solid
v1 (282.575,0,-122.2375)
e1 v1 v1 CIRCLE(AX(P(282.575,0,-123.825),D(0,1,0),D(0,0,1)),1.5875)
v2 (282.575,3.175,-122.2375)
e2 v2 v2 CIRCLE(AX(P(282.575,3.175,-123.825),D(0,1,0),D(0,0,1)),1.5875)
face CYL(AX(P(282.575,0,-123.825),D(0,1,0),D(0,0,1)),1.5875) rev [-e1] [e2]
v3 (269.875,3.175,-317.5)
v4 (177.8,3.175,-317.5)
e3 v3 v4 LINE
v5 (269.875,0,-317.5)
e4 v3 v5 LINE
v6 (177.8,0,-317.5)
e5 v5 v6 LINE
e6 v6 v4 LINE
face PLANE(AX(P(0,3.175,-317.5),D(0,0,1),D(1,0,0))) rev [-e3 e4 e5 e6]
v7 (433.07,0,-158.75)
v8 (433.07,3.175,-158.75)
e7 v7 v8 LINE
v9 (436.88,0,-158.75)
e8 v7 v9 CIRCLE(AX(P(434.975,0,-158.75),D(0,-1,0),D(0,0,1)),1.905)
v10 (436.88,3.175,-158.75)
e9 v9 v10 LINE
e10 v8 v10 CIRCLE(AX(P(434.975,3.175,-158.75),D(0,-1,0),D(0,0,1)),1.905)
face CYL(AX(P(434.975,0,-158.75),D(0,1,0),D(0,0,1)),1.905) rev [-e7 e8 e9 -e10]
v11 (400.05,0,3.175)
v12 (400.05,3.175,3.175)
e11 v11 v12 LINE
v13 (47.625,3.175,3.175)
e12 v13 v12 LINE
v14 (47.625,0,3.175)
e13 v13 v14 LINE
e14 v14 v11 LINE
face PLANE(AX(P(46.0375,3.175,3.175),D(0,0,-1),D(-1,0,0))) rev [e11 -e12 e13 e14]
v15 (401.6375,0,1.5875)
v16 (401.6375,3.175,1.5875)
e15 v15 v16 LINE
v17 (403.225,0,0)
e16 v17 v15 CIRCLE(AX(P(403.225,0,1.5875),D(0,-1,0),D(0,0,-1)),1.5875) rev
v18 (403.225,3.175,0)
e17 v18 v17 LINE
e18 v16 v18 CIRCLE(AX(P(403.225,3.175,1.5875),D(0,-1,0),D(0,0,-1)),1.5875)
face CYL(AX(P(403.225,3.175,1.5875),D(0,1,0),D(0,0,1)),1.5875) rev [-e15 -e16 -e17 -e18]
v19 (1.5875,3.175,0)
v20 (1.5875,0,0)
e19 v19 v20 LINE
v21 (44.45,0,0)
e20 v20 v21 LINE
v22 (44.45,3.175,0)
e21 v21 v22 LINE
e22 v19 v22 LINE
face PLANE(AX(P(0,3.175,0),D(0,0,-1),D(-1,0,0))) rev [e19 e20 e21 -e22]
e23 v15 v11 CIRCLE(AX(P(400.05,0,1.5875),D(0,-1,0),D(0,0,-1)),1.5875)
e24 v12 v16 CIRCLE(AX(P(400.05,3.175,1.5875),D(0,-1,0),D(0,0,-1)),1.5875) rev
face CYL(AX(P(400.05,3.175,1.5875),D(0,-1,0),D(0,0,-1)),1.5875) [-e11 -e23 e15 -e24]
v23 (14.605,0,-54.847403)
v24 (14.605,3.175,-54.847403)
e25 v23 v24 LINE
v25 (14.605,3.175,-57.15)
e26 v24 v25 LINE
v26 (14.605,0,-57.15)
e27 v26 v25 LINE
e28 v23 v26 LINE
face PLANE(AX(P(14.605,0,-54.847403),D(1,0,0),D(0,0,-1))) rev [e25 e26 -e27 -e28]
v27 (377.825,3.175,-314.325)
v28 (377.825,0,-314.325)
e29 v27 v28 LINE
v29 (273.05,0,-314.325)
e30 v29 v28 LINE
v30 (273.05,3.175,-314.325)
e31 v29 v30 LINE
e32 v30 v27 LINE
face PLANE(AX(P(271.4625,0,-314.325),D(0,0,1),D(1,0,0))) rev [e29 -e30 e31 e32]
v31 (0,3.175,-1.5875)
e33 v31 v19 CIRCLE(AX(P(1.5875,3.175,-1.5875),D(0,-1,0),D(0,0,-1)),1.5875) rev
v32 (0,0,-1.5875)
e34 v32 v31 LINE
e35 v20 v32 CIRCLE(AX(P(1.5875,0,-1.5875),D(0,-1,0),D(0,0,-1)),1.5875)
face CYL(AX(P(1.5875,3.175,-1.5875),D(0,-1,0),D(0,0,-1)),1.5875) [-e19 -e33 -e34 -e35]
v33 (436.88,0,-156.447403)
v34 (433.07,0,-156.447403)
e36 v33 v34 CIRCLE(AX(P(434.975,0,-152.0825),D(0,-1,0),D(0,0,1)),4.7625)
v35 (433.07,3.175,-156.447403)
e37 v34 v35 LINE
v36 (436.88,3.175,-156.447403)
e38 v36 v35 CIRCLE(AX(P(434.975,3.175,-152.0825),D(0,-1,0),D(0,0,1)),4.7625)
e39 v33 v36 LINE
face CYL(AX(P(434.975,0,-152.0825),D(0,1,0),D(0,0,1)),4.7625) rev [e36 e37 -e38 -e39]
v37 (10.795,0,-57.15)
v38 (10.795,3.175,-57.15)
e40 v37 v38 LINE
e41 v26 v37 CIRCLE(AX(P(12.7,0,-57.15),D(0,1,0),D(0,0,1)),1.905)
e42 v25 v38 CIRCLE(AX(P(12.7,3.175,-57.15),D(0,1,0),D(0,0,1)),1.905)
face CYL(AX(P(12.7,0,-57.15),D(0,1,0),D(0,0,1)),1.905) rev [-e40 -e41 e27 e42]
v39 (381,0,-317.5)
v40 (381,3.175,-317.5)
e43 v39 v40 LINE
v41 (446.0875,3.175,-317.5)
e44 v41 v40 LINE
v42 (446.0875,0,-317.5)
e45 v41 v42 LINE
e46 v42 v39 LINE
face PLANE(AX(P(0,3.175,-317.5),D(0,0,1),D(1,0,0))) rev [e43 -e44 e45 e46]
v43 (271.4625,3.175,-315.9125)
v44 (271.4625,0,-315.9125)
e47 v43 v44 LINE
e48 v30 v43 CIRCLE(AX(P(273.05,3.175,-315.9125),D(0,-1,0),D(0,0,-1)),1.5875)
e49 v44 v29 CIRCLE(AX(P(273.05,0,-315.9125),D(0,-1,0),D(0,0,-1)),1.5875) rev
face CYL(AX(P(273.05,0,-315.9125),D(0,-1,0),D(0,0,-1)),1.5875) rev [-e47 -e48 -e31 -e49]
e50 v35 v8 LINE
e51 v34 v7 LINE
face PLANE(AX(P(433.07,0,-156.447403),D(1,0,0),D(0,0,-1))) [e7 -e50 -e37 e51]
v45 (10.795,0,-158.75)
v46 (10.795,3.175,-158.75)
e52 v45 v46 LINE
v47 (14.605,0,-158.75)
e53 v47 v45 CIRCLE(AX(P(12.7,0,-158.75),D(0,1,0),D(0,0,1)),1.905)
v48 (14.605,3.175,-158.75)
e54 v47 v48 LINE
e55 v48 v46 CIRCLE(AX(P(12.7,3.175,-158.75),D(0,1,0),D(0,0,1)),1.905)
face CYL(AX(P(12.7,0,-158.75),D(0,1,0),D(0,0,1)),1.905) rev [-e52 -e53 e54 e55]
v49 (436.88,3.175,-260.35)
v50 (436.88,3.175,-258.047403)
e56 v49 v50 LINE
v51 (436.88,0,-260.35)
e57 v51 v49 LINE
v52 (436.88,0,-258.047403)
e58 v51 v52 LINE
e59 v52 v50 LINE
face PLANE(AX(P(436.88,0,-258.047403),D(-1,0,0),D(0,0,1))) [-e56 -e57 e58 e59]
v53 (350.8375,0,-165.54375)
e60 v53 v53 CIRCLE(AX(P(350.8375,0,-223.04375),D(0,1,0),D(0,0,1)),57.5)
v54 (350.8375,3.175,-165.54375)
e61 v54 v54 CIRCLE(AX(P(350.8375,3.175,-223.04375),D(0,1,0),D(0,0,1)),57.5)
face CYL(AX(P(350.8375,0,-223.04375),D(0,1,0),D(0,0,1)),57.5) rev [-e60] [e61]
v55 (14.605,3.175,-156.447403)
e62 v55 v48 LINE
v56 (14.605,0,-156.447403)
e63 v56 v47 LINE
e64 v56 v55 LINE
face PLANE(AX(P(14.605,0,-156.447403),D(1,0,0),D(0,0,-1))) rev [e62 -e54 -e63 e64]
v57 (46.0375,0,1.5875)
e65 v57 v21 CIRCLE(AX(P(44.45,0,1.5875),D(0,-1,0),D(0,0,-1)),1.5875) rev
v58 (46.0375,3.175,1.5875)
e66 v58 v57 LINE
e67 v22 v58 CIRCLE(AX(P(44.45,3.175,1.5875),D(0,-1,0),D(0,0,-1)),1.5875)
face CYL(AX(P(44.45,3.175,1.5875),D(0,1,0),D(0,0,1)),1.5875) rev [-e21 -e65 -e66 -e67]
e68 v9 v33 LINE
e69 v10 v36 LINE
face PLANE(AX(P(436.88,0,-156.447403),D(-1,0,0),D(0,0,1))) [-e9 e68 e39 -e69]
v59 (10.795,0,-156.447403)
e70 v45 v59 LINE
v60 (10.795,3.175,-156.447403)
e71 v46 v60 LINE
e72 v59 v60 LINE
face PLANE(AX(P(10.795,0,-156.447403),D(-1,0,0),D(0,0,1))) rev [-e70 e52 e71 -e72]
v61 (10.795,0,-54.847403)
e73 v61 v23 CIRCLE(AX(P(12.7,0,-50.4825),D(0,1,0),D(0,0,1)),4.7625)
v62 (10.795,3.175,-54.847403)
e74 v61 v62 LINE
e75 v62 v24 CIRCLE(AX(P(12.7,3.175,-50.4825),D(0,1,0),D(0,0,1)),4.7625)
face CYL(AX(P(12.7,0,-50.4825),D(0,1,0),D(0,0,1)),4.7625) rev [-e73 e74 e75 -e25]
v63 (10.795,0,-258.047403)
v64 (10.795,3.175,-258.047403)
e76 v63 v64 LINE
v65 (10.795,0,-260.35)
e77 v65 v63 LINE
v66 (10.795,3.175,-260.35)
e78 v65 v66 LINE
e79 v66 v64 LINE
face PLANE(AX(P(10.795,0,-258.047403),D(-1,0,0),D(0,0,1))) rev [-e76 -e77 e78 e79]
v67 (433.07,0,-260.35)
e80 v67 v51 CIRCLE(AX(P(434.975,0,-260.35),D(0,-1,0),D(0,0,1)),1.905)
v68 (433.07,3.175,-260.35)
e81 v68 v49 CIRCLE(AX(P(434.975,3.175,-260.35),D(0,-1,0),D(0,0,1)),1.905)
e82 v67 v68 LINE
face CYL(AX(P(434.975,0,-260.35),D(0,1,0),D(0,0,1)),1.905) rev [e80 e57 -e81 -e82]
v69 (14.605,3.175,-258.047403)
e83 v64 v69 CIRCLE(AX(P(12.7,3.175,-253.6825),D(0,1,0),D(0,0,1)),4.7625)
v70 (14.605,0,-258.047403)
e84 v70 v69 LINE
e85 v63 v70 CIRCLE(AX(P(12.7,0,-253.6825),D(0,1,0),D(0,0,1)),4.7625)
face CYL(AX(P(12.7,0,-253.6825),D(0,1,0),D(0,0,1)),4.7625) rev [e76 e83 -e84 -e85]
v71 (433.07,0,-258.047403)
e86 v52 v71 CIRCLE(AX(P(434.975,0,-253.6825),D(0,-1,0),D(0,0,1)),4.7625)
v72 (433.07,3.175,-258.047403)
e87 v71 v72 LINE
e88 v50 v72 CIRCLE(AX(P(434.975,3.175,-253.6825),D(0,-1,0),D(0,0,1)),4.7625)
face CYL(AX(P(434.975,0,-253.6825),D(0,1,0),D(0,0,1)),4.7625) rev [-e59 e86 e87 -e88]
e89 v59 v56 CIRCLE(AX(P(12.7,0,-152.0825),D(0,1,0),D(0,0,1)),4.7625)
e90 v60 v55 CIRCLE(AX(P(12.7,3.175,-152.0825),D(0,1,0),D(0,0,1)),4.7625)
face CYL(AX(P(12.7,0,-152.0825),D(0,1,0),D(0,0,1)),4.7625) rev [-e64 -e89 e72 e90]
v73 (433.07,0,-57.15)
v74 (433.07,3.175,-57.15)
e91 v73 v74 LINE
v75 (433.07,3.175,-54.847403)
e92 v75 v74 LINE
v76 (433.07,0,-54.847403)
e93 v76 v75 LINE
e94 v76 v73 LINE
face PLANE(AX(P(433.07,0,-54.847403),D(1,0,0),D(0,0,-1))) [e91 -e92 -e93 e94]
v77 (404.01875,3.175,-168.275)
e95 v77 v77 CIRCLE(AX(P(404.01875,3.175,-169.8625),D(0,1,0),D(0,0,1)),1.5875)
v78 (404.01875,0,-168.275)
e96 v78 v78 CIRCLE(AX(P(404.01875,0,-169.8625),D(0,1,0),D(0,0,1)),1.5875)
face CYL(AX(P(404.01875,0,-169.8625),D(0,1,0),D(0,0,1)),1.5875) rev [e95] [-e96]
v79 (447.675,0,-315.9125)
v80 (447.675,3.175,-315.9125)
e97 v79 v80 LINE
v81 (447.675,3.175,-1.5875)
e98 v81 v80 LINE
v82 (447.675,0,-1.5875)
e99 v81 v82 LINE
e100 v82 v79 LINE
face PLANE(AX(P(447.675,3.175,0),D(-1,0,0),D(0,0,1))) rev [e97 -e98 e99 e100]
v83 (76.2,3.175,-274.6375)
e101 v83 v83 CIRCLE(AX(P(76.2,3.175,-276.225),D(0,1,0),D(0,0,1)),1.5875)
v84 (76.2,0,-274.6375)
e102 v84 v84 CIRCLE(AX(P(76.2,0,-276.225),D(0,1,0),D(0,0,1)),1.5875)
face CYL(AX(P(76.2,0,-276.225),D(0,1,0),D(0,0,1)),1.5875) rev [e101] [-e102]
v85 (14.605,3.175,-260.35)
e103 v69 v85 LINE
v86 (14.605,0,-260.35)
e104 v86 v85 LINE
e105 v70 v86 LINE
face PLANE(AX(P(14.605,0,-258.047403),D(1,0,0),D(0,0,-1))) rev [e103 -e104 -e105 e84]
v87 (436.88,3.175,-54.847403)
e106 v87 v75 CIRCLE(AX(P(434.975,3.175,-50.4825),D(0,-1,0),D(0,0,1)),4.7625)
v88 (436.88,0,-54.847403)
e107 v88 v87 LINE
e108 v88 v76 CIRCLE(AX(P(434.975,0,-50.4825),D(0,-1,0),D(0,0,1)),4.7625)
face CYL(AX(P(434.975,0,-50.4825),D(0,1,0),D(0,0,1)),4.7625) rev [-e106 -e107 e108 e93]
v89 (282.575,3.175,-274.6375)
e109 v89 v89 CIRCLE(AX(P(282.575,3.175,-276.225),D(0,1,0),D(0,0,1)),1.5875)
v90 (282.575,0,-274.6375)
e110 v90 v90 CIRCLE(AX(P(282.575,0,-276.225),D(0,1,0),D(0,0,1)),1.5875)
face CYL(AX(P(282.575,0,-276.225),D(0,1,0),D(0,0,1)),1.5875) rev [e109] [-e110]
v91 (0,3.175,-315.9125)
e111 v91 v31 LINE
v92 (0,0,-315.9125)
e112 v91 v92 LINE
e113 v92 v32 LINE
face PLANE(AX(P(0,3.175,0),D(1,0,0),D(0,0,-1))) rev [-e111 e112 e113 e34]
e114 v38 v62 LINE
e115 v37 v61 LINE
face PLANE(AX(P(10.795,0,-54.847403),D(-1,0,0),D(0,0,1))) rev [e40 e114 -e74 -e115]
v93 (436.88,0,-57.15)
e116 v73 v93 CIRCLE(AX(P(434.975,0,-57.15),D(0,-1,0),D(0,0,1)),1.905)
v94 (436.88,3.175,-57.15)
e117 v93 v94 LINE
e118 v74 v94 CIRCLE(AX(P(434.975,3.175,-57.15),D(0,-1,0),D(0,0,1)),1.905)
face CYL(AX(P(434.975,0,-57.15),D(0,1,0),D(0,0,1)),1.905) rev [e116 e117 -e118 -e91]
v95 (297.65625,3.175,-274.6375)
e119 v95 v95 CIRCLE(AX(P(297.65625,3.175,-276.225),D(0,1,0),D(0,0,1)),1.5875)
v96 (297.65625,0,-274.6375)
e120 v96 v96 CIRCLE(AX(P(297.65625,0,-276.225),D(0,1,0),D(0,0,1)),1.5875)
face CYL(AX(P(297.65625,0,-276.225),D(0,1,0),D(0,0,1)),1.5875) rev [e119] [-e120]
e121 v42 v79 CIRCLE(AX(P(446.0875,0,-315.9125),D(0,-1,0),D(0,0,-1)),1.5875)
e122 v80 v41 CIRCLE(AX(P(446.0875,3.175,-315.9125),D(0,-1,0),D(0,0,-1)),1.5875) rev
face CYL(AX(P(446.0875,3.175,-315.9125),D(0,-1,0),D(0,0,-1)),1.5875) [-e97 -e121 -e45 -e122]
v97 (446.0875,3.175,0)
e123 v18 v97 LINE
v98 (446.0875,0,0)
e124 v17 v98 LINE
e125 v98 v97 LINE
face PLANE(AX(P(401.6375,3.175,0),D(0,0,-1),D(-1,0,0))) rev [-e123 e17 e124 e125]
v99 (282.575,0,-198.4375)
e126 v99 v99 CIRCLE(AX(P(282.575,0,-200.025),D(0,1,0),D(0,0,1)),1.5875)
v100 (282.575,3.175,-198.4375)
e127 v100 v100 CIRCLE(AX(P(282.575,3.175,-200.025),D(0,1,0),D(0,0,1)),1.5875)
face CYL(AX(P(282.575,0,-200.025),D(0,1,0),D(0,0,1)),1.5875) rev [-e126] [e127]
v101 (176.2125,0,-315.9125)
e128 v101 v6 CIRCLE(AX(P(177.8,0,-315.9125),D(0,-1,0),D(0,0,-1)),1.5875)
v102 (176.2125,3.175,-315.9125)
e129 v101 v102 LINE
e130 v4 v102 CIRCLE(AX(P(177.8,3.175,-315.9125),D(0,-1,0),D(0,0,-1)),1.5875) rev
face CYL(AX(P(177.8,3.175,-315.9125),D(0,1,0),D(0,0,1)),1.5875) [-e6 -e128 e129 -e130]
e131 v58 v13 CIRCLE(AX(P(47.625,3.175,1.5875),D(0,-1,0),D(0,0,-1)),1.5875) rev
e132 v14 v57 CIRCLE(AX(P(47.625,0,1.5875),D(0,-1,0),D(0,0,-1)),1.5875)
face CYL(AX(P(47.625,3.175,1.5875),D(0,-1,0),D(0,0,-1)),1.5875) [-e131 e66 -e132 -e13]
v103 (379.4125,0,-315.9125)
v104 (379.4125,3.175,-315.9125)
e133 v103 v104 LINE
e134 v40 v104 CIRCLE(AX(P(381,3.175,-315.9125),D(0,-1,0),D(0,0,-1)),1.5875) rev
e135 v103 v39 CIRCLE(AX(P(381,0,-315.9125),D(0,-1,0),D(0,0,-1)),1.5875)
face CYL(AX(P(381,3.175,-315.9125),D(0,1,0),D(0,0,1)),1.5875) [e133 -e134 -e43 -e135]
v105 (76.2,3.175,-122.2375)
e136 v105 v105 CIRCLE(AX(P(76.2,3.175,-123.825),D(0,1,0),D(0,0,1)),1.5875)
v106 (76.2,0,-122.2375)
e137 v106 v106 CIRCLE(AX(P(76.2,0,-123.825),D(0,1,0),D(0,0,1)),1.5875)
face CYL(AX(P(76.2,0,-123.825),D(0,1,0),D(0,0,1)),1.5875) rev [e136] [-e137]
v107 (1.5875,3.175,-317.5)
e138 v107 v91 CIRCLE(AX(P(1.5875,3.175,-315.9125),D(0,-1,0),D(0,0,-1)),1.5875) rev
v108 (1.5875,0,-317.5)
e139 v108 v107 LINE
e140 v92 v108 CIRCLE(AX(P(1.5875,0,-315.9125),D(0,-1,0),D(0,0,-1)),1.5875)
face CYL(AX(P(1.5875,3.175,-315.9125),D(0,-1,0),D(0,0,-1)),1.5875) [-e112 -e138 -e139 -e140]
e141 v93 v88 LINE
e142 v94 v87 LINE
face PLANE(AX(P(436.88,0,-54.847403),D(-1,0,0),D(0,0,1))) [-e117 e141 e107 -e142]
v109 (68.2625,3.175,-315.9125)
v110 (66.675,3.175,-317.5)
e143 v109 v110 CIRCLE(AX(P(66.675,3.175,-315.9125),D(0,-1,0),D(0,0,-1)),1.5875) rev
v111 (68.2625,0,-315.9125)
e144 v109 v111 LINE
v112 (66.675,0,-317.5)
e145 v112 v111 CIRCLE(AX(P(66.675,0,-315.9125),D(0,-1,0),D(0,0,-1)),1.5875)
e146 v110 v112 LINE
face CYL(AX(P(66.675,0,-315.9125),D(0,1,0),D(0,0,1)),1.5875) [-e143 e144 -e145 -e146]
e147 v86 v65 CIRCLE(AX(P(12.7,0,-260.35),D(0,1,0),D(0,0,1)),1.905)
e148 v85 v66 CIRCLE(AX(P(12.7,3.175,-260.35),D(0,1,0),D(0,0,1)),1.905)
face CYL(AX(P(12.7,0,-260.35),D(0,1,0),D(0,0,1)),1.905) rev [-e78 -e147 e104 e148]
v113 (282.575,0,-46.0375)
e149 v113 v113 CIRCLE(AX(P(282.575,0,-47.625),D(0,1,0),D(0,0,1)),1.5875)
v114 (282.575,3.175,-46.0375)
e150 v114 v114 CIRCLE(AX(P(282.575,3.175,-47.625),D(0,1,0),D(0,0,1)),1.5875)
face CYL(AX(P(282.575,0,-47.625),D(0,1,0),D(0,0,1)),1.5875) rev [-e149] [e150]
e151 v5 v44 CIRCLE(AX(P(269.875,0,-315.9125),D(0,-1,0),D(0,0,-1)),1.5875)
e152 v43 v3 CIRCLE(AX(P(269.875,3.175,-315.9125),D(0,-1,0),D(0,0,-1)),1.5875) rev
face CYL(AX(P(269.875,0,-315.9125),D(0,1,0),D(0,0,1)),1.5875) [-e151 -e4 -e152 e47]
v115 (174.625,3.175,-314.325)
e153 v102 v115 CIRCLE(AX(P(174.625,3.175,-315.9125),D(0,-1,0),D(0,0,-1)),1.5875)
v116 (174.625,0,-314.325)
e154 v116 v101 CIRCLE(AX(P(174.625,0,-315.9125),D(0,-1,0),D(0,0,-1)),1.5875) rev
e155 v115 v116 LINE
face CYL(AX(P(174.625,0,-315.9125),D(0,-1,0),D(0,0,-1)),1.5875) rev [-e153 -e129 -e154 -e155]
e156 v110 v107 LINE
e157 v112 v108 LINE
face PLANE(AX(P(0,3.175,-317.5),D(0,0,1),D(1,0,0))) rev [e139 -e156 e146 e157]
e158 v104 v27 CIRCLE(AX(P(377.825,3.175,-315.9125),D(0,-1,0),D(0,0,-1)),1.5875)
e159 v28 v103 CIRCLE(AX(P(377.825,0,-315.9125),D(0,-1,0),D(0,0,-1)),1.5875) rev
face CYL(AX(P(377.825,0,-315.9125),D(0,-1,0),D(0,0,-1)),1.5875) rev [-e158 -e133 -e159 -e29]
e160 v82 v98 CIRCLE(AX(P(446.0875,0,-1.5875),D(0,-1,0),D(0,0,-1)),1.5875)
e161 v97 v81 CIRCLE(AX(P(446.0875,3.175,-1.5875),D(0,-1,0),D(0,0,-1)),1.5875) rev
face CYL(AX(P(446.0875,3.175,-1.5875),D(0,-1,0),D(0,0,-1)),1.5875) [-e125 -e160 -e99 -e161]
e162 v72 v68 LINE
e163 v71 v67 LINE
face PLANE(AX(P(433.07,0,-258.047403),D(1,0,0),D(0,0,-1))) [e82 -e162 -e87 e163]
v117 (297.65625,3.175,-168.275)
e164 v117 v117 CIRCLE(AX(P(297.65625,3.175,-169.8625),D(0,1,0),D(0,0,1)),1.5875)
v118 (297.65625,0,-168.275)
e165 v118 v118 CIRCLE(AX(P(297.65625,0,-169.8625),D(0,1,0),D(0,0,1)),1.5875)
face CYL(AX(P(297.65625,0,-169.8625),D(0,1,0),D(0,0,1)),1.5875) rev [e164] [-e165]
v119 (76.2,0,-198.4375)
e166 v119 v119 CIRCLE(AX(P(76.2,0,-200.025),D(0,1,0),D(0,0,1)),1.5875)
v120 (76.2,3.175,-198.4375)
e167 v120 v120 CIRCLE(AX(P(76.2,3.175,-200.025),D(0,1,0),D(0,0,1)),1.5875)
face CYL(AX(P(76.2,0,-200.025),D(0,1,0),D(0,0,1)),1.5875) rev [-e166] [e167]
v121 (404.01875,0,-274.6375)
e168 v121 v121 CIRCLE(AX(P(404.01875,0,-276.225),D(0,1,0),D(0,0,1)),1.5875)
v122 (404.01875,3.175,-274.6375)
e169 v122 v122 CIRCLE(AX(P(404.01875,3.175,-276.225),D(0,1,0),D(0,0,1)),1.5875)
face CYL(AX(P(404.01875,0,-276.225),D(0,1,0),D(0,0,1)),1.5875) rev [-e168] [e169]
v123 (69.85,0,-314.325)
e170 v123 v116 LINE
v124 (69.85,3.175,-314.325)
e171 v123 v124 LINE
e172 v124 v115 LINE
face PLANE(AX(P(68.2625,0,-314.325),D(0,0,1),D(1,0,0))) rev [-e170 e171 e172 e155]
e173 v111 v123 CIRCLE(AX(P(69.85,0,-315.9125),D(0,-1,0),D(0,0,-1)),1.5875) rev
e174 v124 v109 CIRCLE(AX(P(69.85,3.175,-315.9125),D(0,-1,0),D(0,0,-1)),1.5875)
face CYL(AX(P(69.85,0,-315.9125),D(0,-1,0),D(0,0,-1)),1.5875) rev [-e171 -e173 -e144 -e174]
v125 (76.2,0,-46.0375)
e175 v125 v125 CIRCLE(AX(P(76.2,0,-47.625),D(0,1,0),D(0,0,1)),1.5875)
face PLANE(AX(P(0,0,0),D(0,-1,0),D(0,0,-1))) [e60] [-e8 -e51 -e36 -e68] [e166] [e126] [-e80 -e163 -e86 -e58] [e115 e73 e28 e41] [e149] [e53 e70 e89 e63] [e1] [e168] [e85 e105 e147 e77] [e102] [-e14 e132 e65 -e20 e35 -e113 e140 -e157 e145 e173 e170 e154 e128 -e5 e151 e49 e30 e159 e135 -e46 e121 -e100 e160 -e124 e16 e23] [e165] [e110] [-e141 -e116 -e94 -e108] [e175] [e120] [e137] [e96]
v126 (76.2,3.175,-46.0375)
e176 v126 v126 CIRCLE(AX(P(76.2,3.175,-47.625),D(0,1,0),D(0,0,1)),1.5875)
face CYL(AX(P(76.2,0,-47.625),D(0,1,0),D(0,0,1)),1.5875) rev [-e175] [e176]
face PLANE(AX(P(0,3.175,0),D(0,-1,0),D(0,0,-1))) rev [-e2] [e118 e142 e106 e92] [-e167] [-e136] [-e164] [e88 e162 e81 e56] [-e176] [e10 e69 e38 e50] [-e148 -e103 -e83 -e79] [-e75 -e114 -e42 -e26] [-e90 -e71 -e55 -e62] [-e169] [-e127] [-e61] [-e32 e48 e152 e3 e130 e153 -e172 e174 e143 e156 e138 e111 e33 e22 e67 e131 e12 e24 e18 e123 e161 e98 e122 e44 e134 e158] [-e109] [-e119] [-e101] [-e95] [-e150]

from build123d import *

# Parameters (mm, degrees)
BOSS_EXTRUDE1_DEPTH  = 3.175
SKETCH3_W            = 107.95
SKETCH3_H            = 3.175
CUT_EXTRUDE2_DEPTH   = 549.843544419
FILLET1_R            = 1.5875
CUT_EXTRUDE1_DEPTH   = 549.843544419
LPATTERN1_COUNT      = 3
LPATTERN1_PITCH      = 101.6
MIRROR1_COPY_1_DEPTH = 549.843544419
MIRROR1_COPY_2_DEPTH = 549.843544419
SKETCH4_R            = 1.5875
CUT_EXTRUDE3_DEPTH   = 549.843544419
LPATTERN2_COUNT      = 4
LPATTERN2_PITCH      = 76.2
SKETCH5_R            = 1.5875
SKETCH5_R_2          = 57.5
CUT_EXTRUDE4_DEPTH   = 549.843544419


with BuildPart() as part:
    # Sketch1 → Boss-Extrude1 (new body)
    with BuildSketch(Plane(origin=(0, 0, 0), x_dir=(1, 0, 0), z_dir=(0, 1, 0))):
        Polygon((401.6375, 0), (447.675, 0), (447.675, 317.5), (0, 317.5), (0, 0), (46.0375, 0), (46.0375, -3.175), (401.6375, -3.175), align=None)
    extrude(amount=BOSS_EXTRUDE1_DEPTH)

    # Sketch3 → Cut-Extrude2 (cut, through all)
    with BuildSketch(Plane(origin=(0, 3.175, 0), x_dir=(1, 0, 0), z_dir=(0, 1, 0))):
        with Locations((122.2375, 315.9125)):
            Rectangle(SKETCH3_W, SKETCH3_H)
        with Locations((325.4375, 315.9125)):
            Rectangle(SKETCH3_W, SKETCH3_H)
    extrude(amount=-CUT_EXTRUDE2_DEPTH, mode=Mode.SUBTRACT)

    # Fillet1
    fillet1_edges = [part.edges().sort_by_distance(p)[0] for p in [
        (379.4125, 1.5875, -317.5),
        (271.4625, 1.5875, -317.5),
        (176.2125, 1.5875, -317.5),
        (68.2625, 1.5875, -317.5),
        (379.4125, 1.5875, -314.325),
        (271.4625, 1.5875, -314.325),
        (176.2125, 1.5875, -314.325),
        (68.2625, 1.5875, -314.325),
        (447.675, 1.5875, -317.5),
        (447.675, 1.5875, 0),
        (0, 1.5875, 0),
        (0, 1.5875, -317.5),
        (401.6375, 1.5875, 3.175),
        (401.6375, 1.5875, 0),
        (46.0375, 1.5875, 3.175),
        (46.0375, 1.5875, 0),
    ]]
    fillet(fillet1_edges, radius=FILLET1_R - 0.0001)  # a hair under: the kernel refuses the full size

    # Sketch2 → Cut-Extrude1 (cut, through all)
    with BuildSketch(Plane(origin=(0, 3.175, 0), x_dir=(1, 0, 0), z_dir=(0, 1, 0))):
        with BuildLine():
            Line((10.795, 258.047403349), (10.795, 260.35))
            ThreePointArc((10.795, 260.35), (12.7, 262.255), (14.605, 260.35))
            Line((14.605, 260.35), (14.605, 258.047403349))
            ThreePointArc((14.605, 258.047403349), (12.7, 248.92), (10.795, 258.047403349))
        make_face()
    cut_extrude1 = extrude(amount=-CUT_EXTRUDE1_DEPTH, mode=Mode.SUBTRACT)

    # LPattern1: Cut-Extrude1 ×3
    with Locations(*[(0, 0, i * LPATTERN1_PITCH) for i in range(1, LPATTERN1_COUNT)]):
        add(cut_extrude1, mode=Mode.SUBTRACT)

    # Mirror1: Cut-Extrude1 across plane
    add(cut_extrude1.mirror(Plane.ZY.offset(-223.8375)), mode=Mode.SUBTRACT)

    # Mirror1 copy 1 sketch → Mirror1 copy 1 (cut, through all)
    with BuildSketch(Plane(origin=(447.675, 3.175, 101.6), x_dir=(-1, 0, 0), z_dir=(0, 1, 0))):
        with BuildLine():
            Line((10.795, -258.047403349), (10.795, -260.35))
            ThreePointArc((10.795, -260.35), (12.7, -262.255), (14.605, -260.35))
            Line((14.605, -260.35), (14.605, -258.047403349))
            ThreePointArc((14.605, -258.047403349), (12.7, -248.92), (10.795, -258.047403349))
        make_face()
    extrude(amount=-MIRROR1_COPY_1_DEPTH, mode=Mode.SUBTRACT)

    # Mirror1 copy 2 sketch → Mirror1 copy 2 (cut, through all)
    with BuildSketch(Plane(origin=(447.675, 3.175, 203.2), x_dir=(-1, 0, 0), z_dir=(0, 1, 0))):
        with BuildLine():
            Line((10.795, -258.047403349), (10.795, -260.35))
            ThreePointArc((10.795, -260.35), (12.7, -262.255), (14.605, -260.35))
            Line((14.605, -260.35), (14.605, -258.047403349))
            ThreePointArc((14.605, -258.047403349), (12.7, -248.92), (10.795, -258.047403349))
        make_face()
    extrude(amount=-MIRROR1_COPY_2_DEPTH, mode=Mode.SUBTRACT)

    # Sketch4 → Cut-Extrude3 (cut, through all)
    with BuildSketch(Plane(origin=(0, 3.175, 0), x_dir=(1, 0, 0), z_dir=(0, 1, 0))):
        with Locations(Location((282.575, 276.225, 0), (0, 0, 270))):
            Circle(SKETCH4_R)
        with Locations(Location((76.2, 276.225, 0), (0, 0, 270))):
            Circle(SKETCH4_R)
    cut_extrude3 = extrude(amount=-CUT_EXTRUDE3_DEPTH, mode=Mode.SUBTRACT)

    # LPattern2: Cut-Extrude3 ×4
    with Locations(*[(0, 0, i * LPATTERN2_PITCH) for i in range(1, LPATTERN2_COUNT)]):
        add(cut_extrude3, mode=Mode.SUBTRACT)

    # Sketch5 → Cut-Extrude4 (cut, through all)
    with BuildSketch(Plane(origin=(0, 3.175, 0), x_dir=(1, 0, 0), z_dir=(0, 1, 0))):
        with Locations(Location((297.65625, 276.225, 0), (0, 0, 270))):
            Circle(SKETCH5_R)
        with Locations(Location((404.01875, 276.225, 0), (0, 0, 270))):
            Circle(SKETCH5_R)
        with Locations(Location((404.01875, 169.8625, 0), (0, 0, 270))):
            Circle(SKETCH5_R)
        with Locations(Location((297.65625, 169.8625, 0), (0, 0, 270))):
            Circle(SKETCH5_R)
        with Locations(Location((350.8375, 223.04375, 0), (0, 0, 270))):
            Circle(SKETCH5_R_2)
    extrude(amount=-CUT_EXTRUDE4_DEPTH, mode=Mode.SUBTRACT)


solid = part.part
